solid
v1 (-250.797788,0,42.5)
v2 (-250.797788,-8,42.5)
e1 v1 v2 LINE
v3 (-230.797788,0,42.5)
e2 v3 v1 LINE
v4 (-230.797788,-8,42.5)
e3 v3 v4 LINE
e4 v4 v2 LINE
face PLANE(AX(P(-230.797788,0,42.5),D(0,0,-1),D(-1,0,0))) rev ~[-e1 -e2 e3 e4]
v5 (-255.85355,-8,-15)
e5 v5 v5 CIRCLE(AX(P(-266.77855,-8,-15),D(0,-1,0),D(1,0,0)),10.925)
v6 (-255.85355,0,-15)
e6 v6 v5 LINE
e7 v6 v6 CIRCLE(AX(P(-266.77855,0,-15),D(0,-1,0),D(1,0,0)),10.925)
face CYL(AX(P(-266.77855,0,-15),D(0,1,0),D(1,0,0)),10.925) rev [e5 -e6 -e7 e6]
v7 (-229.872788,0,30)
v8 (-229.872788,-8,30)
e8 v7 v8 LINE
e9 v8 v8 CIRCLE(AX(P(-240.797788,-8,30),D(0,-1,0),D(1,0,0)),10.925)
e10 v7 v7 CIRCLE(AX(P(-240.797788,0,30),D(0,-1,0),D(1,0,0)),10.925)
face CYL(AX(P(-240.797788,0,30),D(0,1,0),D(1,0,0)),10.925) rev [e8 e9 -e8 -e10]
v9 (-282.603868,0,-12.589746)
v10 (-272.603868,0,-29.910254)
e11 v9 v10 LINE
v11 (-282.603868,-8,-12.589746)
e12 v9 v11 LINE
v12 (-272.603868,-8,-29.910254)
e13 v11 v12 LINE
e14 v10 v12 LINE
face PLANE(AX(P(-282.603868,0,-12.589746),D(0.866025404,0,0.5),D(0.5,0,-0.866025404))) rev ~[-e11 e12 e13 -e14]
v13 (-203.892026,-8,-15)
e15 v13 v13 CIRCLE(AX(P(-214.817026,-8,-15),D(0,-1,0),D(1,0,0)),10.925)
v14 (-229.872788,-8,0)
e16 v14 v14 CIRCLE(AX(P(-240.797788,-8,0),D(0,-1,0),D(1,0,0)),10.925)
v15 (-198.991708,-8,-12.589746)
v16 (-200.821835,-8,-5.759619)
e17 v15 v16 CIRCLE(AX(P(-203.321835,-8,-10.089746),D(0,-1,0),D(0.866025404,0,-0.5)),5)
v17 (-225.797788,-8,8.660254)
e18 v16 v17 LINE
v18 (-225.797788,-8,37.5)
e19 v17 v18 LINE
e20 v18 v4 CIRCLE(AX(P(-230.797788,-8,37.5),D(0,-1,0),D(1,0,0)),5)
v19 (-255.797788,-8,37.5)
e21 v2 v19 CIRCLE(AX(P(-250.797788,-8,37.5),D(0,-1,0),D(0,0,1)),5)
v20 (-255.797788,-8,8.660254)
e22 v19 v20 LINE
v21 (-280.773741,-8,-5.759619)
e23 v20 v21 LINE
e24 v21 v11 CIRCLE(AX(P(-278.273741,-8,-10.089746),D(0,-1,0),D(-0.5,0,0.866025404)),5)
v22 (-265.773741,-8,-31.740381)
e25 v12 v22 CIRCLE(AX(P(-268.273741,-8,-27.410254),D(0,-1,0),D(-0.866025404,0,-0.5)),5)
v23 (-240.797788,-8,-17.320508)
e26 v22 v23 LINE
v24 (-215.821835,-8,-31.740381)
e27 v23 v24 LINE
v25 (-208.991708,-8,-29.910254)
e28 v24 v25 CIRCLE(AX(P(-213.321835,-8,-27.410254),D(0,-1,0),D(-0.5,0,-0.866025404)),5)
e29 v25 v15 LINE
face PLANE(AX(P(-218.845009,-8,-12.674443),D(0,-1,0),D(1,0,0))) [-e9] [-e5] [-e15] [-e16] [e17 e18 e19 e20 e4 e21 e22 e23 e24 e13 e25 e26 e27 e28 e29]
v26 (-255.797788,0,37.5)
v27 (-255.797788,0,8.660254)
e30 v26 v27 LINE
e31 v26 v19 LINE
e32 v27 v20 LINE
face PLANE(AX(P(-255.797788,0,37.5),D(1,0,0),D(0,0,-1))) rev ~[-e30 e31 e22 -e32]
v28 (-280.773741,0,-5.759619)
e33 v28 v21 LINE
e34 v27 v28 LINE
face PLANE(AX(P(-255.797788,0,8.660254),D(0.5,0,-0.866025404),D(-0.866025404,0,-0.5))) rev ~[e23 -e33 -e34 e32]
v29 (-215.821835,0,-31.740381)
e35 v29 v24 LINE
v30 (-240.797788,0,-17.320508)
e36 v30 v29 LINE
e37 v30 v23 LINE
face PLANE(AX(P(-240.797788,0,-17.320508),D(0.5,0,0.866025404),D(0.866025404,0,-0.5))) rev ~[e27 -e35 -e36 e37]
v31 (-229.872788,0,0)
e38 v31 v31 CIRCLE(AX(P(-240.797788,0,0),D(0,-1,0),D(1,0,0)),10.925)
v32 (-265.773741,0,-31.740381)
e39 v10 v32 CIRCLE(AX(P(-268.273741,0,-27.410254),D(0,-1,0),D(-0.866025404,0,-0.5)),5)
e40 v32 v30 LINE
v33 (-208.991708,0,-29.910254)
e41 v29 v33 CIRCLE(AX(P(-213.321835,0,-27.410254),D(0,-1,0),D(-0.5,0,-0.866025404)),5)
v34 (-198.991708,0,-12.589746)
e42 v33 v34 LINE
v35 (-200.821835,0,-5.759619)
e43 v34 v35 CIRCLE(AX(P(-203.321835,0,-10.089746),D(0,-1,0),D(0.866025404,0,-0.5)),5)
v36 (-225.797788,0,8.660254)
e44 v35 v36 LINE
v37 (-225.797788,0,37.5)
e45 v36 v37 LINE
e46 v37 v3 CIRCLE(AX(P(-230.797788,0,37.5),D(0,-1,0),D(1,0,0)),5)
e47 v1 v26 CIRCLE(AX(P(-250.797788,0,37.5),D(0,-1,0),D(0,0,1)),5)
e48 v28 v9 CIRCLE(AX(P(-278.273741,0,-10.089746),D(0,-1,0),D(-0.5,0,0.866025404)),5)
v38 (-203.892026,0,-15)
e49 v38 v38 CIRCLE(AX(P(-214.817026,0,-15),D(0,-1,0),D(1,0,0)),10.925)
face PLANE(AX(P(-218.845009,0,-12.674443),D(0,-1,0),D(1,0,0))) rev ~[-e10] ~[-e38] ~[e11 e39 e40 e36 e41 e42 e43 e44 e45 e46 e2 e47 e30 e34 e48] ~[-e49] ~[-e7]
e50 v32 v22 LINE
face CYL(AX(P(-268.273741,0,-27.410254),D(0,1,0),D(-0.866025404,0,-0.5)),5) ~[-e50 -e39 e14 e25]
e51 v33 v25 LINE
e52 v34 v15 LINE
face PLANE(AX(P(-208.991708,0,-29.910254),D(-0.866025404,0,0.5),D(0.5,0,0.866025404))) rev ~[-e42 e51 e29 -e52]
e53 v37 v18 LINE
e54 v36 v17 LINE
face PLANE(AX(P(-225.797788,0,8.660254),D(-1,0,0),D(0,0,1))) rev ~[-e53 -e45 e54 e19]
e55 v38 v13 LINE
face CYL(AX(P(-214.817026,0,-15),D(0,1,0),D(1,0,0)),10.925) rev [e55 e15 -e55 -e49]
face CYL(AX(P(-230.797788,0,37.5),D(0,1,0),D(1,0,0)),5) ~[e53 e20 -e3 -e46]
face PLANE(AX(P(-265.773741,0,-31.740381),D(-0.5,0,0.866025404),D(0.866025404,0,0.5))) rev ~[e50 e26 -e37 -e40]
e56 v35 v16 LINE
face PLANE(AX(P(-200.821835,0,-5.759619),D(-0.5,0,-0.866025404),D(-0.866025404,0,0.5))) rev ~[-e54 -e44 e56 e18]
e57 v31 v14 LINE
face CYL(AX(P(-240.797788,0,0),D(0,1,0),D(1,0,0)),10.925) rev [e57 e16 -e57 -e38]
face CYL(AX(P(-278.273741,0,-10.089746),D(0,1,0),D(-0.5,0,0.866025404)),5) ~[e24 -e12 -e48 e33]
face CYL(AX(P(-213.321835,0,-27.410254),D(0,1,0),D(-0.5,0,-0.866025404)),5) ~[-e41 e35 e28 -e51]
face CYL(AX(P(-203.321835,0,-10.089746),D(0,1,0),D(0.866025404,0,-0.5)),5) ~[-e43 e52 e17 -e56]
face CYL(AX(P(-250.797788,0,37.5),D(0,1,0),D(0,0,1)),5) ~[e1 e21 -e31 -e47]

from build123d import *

# Parameters (mm, degrees)
F0_R     = 10.925
F1_DEPTH = 8


with BuildPart() as f1:
    # F0 (on Front) → F1 (new body)
    with BuildSketch(Plane.XZ):
        with BuildLine():
            Line((-225.7977879047, -8.6602540378), (-225.7977879047, -12.5))
            Line((-225.7977879047, -12.5), (-232.4484229994, -12.5))
            Line((-232.4484229994, -12.5), (-240.7977879047, -17.3205080757))
            Line((-240.7977879047, -17.3205080757), (-215.8218352628, -31.7403810568))
            ThreePointArc((-215.8218352628, -31.7403810568), (-212.0277400373, -32.2398831693), (-208.9917082439, -29.9102540378))
            Line((-208.9917082439, -29.9102540378), (-198.9917082439, -12.5897459622))
            ThreePointArc((-198.9917082439, -12.5897459622), (-198.4922061314, -8.7956507366), (-200.8218352628, -5.7596189432))
            Line((-200.8218352628, -5.7596189432), (-225.7977879047, 8.6602540378))
            Line((-225.7977879047, 8.6602540378), (-225.7977879047, -0.9807621135))
            Line((-225.7977879047, -0.9807621135), (-222.4724703574, -6.7403810568))
            Line((-222.4724703574, -6.7403810568), (-225.7977879047, -8.6602540378))
        make_face()
        with Locations((-214.8170257912, -15)):
            Circle(F0_R, mode=Mode.SUBTRACT)
        Polygon((-240.7977879047, -17.3205080757), (-232.4484229994, -12.5), (-249.1471528101, -12.5), align=None)
        with BuildLine():
            Line((-240.7977879047, -17.3205080757), (-249.1471528101, -12.5))
            Line((-249.1471528101, -12.5), (-255.7977879047, -12.5))
            Line((-255.7977879047, -12.5), (-255.7977879047, -8.6602540378))
            Line((-255.7977879047, -8.6602540378), (-259.123105452, -6.7403810568))
            Line((-259.123105452, -6.7403810568), (-255.7977879047, -0.9807621135))
            Line((-255.7977879047, -0.9807621135), (-255.7977879047, 8.6602540378))
            Line((-255.7977879047, 8.6602540378), (-280.7737405467, -5.7596189432))
            ThreePointArc((-280.7737405467, -5.7596189432), (-283.1033696781, -8.7956507366), (-282.6038675656, -12.5897459622))
            Line((-282.6038675656, -12.5897459622), (-272.6038675656, -29.9102540378))
            ThreePointArc((-272.6038675656, -29.9102540378), (-269.5678357722, -32.2398831693), (-265.7737405467, -31.7403810568))
            Line((-265.7737405467, -31.7403810568), (-240.7977879047, -17.3205080757))
        make_face()
        with Locations((-266.7785500183, -15)):
            Circle(F0_R, mode=Mode.SUBTRACT)
        Polygon((-234.1471528101, 13.4807621135), (-225.7977879047, -0.9807621135), (-225.7977879047, 8.6602540378), align=None)
        with BuildLine():
            Line((-234.1471528101, 13.4807621135), (-225.7977879047, 8.6602540378))
            Line((-225.7977879047, 8.6602540378), (-225.7977879047, 37.5))
            ThreePointArc((-225.7977879047, 37.5), (-227.2622539988, 41.0355339059), (-230.7977879047, 42.5))
            Line((-230.7977879047, 42.5), (-250.7977879047, 42.5))
            ThreePointArc((-250.7977879047, 42.5), (-254.3333218107, 41.0355339059), (-255.7977879047, 37.5))
            Line((-255.7977879047, 37.5), (-255.7977879047, 8.6602540378))
            Line((-255.7977879047, 8.6602540378), (-247.4484229994, 13.4807621135))
            Line((-247.4484229994, 13.4807621135), (-244.123105452, 19.2403810568))
            Line((-244.123105452, 19.2403810568), (-240.7977879047, 17.3205080757))
            Line((-240.7977879047, 17.3205080757), (-237.4724703574, 19.2403810568))
            Line((-237.4724703574, 19.2403810568), (-234.1471528101, 13.4807621135))
        make_face()
        with Locations((-240.7977879047, 30)):
            Circle(F0_R, mode=Mode.SUBTRACT)
        Polygon((-255.7977879047, 8.6602540378), (-255.7977879047, -0.9807621135), (-247.4484229994, 13.4807621135), align=None)
        Polygon((-247.4484229994, 13.4807621135), (-240.7977879047, 17.3205080757), (-244.123105452, 19.2403810568), align=None)
        Polygon((-240.7977879047, 17.3205080757), (-234.1471528101, 13.4807621135), (-237.4724703574, 19.2403810568), align=None)
        Polygon((-249.1471528101, -12.5), (-232.4484229994, -12.5), (-225.7977879047, -8.6602540378), (-225.7977879047, -0.9807621135), (-234.1471528101, 13.4807621135), (-240.7977879047, 17.3205080757), (-247.4484229994, 13.4807621135), (-255.7977879047, -0.9807621135), (-255.7977879047, -8.6602540378), align=None)
        with Locations((-240.7977879047, 0)):
            Circle(F0_R, mode=Mode.SUBTRACT)
        Polygon((-225.7977879047, -0.9807621135), (-225.7977879047, -8.6602540378), (-222.4724703574, -6.7403810568), align=None)
        Polygon((-232.4484229994, -12.5), (-225.7977879047, -12.5), (-225.7977879047, -8.6602540378), align=None)
        Polygon((-255.7977879047, -12.5), (-249.1471528101, -12.5), (-255.7977879047, -8.6602540378), align=None)
        Polygon((-259.123105452, -6.7403810568), (-255.7977879047, -8.6602540378), (-255.7977879047, -0.9807621135), align=None)
    extrude(amount=F1_DEPTH)


solid = f1.part
